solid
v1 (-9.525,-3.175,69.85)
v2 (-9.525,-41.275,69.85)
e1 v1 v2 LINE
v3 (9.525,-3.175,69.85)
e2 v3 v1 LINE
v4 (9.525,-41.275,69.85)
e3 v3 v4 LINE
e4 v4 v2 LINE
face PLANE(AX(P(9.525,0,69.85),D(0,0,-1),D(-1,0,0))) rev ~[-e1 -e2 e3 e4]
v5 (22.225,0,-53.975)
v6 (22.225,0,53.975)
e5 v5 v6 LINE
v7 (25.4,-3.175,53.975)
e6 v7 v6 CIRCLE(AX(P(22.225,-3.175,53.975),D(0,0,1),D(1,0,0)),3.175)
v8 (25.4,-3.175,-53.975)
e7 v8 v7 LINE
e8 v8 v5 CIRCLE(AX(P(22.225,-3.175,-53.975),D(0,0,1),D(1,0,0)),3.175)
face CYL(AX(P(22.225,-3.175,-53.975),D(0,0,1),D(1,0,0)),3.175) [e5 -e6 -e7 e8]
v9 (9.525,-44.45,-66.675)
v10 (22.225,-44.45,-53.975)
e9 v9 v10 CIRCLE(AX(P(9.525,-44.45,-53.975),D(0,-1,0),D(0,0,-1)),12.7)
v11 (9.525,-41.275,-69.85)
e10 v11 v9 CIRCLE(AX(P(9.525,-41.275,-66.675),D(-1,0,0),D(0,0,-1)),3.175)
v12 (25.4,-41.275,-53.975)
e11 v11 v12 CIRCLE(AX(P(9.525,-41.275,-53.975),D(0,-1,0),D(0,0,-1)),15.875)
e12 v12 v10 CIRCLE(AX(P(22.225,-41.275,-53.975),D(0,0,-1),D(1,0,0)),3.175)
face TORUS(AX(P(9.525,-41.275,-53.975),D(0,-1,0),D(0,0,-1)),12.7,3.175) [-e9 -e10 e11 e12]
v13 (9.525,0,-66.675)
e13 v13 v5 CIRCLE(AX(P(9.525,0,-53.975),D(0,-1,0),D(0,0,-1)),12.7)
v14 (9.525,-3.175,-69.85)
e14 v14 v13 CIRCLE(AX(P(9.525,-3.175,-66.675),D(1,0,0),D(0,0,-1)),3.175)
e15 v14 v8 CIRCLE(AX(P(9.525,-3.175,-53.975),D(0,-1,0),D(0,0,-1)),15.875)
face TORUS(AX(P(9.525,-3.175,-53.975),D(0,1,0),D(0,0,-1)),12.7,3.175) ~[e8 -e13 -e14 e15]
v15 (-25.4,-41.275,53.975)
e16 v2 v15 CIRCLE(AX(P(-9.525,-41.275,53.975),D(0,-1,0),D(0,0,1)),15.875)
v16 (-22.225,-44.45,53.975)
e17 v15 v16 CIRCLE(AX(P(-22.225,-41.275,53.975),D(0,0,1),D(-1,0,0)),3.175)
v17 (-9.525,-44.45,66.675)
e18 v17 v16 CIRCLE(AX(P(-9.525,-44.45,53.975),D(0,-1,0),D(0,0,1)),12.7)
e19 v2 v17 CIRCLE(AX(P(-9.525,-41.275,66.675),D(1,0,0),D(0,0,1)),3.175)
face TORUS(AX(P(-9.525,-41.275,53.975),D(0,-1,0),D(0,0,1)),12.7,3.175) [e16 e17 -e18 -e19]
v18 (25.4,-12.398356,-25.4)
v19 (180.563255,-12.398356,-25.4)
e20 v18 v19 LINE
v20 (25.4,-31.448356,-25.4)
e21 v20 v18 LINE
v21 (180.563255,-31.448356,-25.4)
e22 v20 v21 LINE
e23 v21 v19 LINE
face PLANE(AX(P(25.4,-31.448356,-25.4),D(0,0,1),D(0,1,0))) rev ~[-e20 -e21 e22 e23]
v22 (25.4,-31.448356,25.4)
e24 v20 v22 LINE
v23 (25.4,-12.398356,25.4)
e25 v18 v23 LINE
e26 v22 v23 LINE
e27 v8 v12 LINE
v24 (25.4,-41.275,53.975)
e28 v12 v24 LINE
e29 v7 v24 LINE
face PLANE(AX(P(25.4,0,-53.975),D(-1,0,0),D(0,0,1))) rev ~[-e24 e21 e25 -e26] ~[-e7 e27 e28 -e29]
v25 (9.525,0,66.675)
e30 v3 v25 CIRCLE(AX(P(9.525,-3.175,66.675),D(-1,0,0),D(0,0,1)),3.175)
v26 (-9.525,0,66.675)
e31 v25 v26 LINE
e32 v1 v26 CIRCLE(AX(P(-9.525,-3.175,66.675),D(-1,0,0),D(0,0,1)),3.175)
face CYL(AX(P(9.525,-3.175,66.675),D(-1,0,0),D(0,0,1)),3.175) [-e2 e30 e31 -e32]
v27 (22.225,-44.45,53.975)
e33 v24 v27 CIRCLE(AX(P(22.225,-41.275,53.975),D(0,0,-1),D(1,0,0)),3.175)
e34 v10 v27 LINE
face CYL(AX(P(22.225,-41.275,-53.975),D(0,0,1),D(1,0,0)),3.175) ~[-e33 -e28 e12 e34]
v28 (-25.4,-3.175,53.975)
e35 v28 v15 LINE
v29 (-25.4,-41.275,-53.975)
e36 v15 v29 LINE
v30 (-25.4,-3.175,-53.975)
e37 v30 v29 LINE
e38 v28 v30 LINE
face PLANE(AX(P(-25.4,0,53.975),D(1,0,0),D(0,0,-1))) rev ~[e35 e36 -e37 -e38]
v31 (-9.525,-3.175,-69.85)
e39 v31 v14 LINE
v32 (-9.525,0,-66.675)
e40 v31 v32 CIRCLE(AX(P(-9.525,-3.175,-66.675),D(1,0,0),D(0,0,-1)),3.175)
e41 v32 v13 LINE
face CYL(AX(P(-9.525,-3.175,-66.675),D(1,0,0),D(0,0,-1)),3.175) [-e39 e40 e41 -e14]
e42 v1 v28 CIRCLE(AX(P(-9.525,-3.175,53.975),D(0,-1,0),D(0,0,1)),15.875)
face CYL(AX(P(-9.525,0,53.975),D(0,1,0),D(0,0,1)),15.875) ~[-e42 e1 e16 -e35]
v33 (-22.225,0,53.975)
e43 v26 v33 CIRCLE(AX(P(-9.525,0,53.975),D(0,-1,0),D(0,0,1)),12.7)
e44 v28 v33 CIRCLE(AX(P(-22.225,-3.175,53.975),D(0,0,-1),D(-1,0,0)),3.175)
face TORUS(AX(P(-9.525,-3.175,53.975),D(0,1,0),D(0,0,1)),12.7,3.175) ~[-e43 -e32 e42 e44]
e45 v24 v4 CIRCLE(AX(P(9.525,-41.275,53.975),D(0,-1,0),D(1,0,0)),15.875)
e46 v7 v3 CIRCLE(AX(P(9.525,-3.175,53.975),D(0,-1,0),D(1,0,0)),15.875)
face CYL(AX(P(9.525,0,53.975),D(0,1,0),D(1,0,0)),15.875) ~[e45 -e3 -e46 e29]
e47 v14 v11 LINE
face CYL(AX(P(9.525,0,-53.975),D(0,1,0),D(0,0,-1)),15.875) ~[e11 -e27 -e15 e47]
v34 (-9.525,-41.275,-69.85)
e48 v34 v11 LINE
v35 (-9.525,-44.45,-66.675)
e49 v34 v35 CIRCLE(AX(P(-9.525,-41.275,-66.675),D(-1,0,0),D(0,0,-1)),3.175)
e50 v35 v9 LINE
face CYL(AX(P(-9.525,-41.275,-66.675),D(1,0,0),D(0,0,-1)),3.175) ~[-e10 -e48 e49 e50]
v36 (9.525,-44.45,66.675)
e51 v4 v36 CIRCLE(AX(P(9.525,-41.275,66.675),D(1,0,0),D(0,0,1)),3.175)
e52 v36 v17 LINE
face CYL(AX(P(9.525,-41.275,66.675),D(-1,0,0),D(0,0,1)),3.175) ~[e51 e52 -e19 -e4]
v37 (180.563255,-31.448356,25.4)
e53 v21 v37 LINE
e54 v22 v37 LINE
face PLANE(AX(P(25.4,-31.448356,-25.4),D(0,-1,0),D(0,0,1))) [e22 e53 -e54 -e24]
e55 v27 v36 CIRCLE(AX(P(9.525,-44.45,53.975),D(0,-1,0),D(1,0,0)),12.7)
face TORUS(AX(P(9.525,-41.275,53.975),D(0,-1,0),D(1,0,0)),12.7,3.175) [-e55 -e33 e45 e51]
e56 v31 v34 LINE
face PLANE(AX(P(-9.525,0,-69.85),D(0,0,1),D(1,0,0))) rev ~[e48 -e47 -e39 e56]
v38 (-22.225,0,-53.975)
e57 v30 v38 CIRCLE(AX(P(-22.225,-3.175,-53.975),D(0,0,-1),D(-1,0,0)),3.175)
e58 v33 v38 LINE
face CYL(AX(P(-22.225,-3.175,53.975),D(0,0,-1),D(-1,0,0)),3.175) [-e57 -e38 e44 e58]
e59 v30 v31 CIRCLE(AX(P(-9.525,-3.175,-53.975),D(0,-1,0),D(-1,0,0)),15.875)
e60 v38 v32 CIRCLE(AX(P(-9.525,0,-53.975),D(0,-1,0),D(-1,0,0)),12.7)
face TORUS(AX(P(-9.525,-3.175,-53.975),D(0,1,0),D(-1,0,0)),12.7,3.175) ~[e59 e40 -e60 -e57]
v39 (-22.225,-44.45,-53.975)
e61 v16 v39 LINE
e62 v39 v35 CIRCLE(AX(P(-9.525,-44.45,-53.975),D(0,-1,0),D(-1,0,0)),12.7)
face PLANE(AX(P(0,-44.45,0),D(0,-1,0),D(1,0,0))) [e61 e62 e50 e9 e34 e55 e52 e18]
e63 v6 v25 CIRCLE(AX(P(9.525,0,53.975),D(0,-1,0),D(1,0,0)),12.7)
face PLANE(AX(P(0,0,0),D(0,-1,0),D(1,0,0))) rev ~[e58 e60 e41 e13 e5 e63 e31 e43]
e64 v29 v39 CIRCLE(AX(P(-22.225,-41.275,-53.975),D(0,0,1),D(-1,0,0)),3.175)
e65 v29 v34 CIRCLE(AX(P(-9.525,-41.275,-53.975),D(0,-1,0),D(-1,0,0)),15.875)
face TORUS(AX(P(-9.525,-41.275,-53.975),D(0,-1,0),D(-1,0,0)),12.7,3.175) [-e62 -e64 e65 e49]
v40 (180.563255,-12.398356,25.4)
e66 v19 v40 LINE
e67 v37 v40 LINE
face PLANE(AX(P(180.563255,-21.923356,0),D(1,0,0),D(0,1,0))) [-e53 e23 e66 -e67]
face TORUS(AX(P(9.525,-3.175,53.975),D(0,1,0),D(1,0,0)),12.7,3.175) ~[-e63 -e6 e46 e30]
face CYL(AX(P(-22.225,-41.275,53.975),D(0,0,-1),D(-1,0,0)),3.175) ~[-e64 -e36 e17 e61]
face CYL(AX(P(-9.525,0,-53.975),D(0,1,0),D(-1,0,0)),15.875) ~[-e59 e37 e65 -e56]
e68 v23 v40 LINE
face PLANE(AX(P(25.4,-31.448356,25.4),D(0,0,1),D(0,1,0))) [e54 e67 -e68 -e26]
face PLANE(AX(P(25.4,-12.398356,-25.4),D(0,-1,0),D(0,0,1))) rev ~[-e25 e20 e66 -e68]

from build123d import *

# Parameters (mm, degrees)
F1_DEPTH = 44.45
F2_R     = 3.175
F3_W     = 19.05
F3_H     = 50.8
F4_DEPTH = 155.1632549


# Not quite as in the source:
# - an extrude ends at something that could not be found from the text; its depth is read off the source's solid


with BuildPart() as f1:
    # F0 (on Front) → F1 (new body)
    with BuildSketch(Plane.XZ):
        with BuildLine():
            Line((9.525, 69.85), (-9.525, 69.85))
            ThreePointArc((-9.525, 69.85), (-20.7503201513, 65.2003201513), (-25.4, 53.975))
            Line((-25.4, 53.975), (-25.4, -53.975))
            ThreePointArc((-25.4, -53.975), (-20.7503201513, -65.2003201513), (-9.525, -69.85))
            Line((-9.525, -69.85), (9.525, -69.85))
            ThreePointArc((9.525, -69.85), (20.7503201513, -65.2003201513), (25.4, -53.975))
            Line((25.4, -53.975), (25.4, 53.975))
            ThreePointArc((25.4, 53.975), (20.7503201513, 65.2003201513), (9.525, 69.85))
        make_face()
    extrude(amount=F1_DEPTH)

    # F2
    f2_edges = [f1.edges().sort_by_distance(p)[0] for p in [
        (0, -44.45, 69.85),
        (20.75032, 0, 65.20032),
        (0, 0, 69.85),
        (-20.75032, 0, 65.20032),
        (-20.75032, -44.45, 65.20032),
        (-25.4, 0, 0),
        (-25.4, -44.45, 0),
        (-20.75032, 0, -65.20032),
        (-20.75032, -44.45, -65.20032),
        (0, 0, -69.85),
        (0, -44.45, -69.85),
        (20.75032, 0, -65.20032),
        (20.75032, -44.45, -65.20032),
        (25.4, 0, 0),
        (25.4, -44.45, 0),
        (20.75032, -44.45, 65.20032),
    ]]
    fillet(f2_edges, radius=F2_R)

    # F3 (on face) → F4 (join, through all)
    with BuildSketch(Plane.YZ.offset(25.4)):
        with Locations((-21.9233557582, 0)):
            Rectangle(F3_W, F3_H)
    extrude(amount=F4_DEPTH)


solid = f1.part
